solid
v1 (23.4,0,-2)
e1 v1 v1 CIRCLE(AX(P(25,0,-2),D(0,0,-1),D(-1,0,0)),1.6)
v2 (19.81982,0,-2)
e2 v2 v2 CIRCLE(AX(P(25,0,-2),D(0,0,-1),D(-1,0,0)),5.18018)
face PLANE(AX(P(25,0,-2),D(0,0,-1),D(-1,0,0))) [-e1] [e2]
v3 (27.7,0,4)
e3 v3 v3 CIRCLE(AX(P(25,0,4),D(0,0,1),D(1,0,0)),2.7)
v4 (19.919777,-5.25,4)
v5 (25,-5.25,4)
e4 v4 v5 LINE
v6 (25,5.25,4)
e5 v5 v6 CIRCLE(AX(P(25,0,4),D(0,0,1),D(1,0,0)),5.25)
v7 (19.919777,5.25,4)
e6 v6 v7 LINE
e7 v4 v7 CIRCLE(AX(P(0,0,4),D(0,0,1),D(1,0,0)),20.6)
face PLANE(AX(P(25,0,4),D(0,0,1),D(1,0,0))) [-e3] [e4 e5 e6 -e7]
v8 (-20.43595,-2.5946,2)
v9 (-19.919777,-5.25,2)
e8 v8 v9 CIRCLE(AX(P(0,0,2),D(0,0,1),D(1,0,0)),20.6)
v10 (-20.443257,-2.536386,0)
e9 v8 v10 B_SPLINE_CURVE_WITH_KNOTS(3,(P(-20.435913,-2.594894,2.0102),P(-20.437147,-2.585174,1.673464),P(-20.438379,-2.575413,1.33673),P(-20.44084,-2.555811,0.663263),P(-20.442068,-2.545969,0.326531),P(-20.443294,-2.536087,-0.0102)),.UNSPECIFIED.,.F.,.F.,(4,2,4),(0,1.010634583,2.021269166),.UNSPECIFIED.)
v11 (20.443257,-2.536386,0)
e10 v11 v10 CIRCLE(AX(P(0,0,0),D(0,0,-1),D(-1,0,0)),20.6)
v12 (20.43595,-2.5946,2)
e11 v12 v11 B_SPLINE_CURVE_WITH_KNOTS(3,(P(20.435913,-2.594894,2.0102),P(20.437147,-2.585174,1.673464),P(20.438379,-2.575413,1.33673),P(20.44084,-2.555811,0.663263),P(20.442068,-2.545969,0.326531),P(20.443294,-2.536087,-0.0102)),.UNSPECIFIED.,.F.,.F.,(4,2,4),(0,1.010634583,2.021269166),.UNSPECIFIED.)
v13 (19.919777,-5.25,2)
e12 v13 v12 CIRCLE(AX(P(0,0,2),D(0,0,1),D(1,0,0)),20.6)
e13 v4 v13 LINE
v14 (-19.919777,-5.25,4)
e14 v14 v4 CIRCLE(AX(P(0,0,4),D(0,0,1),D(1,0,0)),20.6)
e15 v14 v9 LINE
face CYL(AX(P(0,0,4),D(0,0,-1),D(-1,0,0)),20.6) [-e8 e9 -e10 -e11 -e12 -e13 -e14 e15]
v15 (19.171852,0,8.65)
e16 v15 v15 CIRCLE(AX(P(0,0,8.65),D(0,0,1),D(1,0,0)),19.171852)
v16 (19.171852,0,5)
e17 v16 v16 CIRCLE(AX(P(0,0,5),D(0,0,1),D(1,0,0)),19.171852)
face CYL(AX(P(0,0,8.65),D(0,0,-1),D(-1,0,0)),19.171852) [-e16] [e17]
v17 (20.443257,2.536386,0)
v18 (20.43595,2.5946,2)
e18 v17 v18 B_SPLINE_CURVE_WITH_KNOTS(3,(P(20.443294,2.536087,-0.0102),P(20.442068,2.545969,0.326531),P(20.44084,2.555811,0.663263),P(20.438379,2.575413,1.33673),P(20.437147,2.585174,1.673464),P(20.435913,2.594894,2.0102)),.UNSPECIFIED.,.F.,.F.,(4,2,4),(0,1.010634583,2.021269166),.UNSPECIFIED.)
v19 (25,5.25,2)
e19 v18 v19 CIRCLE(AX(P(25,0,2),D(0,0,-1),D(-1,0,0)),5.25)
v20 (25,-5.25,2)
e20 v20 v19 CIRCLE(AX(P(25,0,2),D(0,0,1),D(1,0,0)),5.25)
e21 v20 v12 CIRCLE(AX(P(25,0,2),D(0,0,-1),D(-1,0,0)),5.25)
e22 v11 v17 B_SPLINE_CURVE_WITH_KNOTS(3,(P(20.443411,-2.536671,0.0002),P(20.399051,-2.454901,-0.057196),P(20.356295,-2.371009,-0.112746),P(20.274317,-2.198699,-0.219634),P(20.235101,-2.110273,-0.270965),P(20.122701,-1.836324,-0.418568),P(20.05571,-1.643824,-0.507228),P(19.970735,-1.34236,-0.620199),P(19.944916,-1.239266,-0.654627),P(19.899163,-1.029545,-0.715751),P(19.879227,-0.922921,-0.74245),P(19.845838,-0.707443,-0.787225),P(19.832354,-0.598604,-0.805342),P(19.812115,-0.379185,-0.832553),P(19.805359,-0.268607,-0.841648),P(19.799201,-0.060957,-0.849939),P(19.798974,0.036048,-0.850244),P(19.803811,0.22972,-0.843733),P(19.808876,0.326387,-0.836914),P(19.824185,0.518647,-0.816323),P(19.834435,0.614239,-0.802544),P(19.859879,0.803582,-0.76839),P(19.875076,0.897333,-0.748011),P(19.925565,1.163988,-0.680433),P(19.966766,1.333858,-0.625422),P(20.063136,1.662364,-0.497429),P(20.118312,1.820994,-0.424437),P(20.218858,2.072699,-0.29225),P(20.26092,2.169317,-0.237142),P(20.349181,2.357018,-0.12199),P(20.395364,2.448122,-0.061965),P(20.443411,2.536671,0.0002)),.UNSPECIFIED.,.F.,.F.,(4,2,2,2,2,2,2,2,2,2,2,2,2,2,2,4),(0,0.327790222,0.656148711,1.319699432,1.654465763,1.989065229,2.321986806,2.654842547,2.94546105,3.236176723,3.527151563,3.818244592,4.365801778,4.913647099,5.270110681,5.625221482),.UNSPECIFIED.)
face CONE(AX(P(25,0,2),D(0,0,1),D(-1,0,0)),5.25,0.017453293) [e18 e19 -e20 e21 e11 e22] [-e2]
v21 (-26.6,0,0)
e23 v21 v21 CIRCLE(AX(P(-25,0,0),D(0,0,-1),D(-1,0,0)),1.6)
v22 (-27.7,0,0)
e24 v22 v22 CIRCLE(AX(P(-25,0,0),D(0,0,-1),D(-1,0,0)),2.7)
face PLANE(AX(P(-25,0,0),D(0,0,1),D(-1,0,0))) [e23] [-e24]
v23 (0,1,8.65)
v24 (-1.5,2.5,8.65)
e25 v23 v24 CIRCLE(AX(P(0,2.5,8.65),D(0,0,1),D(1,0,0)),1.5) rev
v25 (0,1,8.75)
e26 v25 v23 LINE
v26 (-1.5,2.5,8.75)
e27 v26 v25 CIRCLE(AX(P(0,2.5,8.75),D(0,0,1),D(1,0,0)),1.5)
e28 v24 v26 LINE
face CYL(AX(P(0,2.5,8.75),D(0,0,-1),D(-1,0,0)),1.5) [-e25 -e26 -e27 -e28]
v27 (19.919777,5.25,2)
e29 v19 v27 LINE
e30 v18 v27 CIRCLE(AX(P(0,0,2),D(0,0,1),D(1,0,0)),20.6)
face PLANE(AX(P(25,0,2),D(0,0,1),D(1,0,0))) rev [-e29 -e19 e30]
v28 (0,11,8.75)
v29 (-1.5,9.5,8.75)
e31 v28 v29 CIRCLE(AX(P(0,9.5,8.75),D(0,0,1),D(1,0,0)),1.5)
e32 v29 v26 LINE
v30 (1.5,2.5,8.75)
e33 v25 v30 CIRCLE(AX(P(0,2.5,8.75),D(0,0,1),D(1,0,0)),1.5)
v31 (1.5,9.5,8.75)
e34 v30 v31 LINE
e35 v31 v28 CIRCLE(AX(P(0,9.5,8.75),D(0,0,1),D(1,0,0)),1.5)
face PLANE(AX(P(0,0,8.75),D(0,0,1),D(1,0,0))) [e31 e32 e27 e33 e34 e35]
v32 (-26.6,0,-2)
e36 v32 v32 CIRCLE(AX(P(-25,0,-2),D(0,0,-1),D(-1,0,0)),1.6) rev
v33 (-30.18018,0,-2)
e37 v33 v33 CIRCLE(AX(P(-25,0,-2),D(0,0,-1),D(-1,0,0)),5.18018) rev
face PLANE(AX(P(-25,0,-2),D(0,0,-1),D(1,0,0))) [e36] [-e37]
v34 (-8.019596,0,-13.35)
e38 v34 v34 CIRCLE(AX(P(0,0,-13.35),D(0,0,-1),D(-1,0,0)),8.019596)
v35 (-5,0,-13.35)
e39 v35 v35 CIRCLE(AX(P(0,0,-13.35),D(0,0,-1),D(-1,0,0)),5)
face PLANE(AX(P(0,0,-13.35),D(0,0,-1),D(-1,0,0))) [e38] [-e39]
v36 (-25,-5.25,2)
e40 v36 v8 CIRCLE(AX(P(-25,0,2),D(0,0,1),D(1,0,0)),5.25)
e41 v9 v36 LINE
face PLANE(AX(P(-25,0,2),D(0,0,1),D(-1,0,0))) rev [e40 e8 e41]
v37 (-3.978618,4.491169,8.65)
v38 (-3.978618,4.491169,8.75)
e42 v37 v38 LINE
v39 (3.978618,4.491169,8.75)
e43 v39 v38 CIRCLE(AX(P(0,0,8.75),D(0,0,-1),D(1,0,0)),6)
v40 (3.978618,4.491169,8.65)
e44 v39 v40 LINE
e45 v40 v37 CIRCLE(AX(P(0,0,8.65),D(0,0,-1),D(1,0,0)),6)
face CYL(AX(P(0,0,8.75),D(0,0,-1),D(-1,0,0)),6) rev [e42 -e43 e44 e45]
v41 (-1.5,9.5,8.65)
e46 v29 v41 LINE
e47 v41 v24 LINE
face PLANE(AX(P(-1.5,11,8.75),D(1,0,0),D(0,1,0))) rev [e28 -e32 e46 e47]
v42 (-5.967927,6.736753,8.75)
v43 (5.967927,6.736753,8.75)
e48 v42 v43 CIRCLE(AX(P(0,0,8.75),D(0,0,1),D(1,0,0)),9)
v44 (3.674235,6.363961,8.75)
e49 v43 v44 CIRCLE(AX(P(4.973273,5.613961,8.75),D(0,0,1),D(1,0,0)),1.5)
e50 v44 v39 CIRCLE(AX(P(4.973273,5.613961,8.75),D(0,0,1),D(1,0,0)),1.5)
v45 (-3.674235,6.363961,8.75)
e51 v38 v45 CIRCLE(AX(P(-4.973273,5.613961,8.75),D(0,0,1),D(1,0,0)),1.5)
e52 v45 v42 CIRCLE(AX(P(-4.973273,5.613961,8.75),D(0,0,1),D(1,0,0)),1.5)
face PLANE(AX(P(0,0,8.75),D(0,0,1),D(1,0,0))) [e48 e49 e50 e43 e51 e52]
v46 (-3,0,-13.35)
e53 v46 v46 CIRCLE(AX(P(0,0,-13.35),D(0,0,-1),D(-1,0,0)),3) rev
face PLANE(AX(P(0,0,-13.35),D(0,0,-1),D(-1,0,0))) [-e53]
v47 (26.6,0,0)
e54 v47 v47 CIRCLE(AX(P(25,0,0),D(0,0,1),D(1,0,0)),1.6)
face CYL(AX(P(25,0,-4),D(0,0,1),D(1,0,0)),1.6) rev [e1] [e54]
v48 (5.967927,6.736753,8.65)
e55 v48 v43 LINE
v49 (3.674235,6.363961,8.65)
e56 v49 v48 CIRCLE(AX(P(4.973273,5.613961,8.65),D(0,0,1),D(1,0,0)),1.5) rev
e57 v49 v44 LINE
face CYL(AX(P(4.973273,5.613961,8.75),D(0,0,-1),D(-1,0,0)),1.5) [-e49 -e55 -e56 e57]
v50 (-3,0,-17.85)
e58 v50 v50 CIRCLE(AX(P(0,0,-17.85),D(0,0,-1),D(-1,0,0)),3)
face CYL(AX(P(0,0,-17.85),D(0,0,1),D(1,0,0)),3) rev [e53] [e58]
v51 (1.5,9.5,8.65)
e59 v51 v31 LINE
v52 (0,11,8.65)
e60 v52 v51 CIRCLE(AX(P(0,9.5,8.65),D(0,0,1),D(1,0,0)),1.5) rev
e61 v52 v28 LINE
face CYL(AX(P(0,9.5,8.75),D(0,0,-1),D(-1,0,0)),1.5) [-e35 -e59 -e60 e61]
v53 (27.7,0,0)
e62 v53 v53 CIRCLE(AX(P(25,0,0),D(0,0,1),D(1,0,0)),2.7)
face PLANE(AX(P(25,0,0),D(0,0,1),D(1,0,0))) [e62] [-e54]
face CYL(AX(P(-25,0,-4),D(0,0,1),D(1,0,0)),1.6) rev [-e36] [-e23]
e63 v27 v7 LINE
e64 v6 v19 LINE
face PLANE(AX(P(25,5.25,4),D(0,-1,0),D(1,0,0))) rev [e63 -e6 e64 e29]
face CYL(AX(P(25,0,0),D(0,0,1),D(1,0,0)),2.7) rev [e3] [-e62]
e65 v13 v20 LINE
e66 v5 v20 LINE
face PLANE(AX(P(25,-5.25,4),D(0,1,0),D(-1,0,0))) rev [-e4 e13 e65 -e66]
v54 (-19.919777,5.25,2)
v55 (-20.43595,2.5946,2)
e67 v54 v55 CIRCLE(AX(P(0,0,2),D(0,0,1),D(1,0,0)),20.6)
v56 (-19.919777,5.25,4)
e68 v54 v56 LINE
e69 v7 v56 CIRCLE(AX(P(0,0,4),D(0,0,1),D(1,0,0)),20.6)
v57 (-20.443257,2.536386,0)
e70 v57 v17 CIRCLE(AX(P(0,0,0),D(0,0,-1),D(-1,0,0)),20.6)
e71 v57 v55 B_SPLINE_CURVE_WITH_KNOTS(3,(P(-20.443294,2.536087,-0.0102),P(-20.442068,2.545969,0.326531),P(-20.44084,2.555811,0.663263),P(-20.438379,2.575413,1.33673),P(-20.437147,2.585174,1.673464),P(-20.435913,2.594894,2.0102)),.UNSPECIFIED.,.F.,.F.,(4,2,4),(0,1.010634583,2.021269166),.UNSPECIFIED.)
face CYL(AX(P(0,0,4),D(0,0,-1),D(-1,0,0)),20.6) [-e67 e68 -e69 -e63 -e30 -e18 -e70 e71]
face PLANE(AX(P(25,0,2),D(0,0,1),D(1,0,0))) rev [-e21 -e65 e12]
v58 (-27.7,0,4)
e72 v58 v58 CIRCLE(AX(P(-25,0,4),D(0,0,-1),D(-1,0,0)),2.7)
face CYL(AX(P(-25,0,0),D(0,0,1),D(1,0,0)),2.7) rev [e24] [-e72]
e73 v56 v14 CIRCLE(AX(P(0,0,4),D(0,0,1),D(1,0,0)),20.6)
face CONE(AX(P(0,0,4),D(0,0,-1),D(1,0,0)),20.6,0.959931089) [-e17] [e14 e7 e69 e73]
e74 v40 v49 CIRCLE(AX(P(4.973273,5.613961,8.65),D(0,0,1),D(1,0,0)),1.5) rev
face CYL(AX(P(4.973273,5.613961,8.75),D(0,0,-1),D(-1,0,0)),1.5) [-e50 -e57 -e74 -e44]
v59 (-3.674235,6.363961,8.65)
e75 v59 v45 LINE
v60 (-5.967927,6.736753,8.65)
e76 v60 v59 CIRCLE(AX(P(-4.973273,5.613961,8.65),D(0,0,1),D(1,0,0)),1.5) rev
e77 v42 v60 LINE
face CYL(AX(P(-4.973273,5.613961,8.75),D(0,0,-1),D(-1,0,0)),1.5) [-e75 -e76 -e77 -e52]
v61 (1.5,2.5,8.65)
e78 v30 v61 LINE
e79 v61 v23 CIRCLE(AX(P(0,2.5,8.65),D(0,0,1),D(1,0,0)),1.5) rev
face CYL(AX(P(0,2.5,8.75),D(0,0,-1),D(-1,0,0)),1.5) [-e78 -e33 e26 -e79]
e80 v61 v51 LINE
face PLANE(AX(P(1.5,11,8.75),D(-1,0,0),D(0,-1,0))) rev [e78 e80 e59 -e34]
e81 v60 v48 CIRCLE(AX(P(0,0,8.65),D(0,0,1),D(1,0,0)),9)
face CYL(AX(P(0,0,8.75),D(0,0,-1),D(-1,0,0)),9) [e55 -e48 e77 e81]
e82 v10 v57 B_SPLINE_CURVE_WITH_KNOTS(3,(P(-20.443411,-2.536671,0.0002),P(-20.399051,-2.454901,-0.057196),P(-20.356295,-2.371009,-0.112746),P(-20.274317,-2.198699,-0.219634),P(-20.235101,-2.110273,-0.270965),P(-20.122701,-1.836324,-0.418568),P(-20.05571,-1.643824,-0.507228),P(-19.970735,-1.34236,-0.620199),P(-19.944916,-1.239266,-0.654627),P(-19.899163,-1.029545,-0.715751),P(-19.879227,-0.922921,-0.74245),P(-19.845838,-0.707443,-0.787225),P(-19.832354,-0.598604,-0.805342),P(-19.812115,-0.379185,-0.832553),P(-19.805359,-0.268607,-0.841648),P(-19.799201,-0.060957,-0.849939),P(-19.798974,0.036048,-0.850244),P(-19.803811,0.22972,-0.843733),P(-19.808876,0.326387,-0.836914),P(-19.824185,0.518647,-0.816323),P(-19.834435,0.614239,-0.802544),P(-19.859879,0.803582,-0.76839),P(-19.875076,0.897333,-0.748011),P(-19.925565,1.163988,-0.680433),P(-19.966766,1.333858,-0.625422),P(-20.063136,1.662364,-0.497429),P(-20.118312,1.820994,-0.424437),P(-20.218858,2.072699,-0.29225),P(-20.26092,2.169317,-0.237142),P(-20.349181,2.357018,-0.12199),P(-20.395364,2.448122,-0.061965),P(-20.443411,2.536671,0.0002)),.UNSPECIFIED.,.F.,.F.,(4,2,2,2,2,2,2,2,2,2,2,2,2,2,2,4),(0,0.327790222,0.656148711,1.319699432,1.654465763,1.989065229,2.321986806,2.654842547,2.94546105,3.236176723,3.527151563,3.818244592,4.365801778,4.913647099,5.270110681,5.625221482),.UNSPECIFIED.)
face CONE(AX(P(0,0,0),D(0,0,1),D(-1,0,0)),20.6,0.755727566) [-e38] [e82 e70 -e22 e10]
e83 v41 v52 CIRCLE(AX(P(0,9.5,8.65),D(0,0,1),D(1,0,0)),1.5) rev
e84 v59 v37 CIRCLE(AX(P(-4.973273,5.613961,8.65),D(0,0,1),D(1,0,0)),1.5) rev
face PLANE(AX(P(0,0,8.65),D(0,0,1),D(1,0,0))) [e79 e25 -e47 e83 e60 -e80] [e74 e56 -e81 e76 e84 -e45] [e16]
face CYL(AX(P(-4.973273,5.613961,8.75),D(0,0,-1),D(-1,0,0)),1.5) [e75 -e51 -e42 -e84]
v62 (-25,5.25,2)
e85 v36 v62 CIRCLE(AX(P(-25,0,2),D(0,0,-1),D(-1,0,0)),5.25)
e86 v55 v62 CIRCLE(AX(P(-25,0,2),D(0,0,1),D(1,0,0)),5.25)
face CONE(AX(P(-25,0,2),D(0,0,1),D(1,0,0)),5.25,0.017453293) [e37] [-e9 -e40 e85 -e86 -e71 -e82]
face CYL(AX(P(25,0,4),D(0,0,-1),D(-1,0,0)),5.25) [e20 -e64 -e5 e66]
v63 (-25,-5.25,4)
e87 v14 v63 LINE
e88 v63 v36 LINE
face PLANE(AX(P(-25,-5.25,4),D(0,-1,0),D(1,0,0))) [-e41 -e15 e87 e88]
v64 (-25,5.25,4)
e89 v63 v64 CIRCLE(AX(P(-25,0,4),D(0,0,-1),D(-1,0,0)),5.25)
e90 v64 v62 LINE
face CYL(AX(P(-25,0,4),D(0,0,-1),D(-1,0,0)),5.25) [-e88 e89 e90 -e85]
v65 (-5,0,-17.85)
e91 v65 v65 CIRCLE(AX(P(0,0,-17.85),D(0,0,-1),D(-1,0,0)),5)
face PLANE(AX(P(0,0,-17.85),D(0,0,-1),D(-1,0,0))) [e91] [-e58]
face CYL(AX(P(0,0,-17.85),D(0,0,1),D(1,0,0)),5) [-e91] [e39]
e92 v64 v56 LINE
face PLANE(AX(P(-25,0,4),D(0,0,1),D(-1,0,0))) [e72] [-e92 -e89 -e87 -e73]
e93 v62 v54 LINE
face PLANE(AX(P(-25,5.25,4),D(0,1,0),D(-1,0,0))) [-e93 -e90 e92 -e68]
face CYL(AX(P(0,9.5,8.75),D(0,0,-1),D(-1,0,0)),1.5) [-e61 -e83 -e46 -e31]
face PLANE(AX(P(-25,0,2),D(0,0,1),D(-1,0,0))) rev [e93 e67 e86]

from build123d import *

# Parameters (mm, degrees)
SKETCH_1_R          = 20.6
EXTRUDE_1_DEPTH     = 4
SKETCH_2_R          = 20.6
EXTRUDE_2_DEPTH     = 1
EXTRUDE_2_TAPER     = 55
SKETCH_3_R          = 19.171851993
EXTRUDE_3_DEPTH     = 3.65
SKETCH_4_R          = 20.6
EXTRUDE_4_DEPTH     = 13.35
EXTRUDE_4_TAPER     = 43.3
SKETCH_5_R          = 5
SKETCH_5_R_2        = 3
EXTRUDE_5_DEPTH     = 4.5
EXTRUDE_START       = 2
EXTRUDE_6_DEPTH     = 2
SKETCH_7_R          = 5.25
EXTRUDE_8_DEPTH     = 4
EXTRUDE_8_TAPER     = 1
SKETCH_8_R          = 2.7
CUT_EXTRUDE_1_DEPTH = 4
SKETCH_9_R          = 1.6
CUT_EXTRUDE_2_DEPTH = 4
SKETCH_10_W         = 3
SKETCH_10_H         = 10
EXTRUDE_9_DEPTH     = 0.1
FILLET_1_R          = 1.5


with BuildPart() as part:
    # 草图1 → 凸台-拉伸1 (new body)
    with BuildSketch(Plane.XY):
        Circle(SKETCH_1_R)
    extrude(amount=EXTRUDE_1_DEPTH)

    # 草图2 → 凸台-拉伸2 (add)
    with BuildSketch(Plane.XY.offset(4)):
        Circle(SKETCH_2_R)
    extrude(amount=EXTRUDE_2_DEPTH, taper=EXTRUDE_2_TAPER)

    # 草图3 → 凸台-拉伸3 (add)
    with BuildSketch(Plane.XY.offset(5)):
        Circle(SKETCH_3_R)
    extrude(amount=EXTRUDE_3_DEPTH)

    # 草图4 → 凸台-拉伸4 (add)
    with BuildSketch(Plane(origin=(0, 0, 0), x_dir=(-1, 0, 0), z_dir=(0, 0, -1))):
        Circle(SKETCH_4_R)
    extrude(amount=EXTRUDE_4_DEPTH, taper=EXTRUDE_4_TAPER)

    # 草图5 → 凸台-拉伸5 (add)
    with BuildSketch(Plane(origin=(0, 0, -13.35), x_dir=(-1, 0, 0), z_dir=(0, 0, -1))):
        Circle(SKETCH_5_R)
        Circle(SKETCH_5_R_2, mode=Mode.SUBTRACT)
    extrude(amount=EXTRUDE_5_DEPTH)

    # 草图6 → 凸台-拉伸6 (add)
    with BuildSketch(Plane.XY.offset(EXTRUDE_START)):
        with BuildLine():
            Line((25, 5.25), (19.069776605, 5.25))
            Line((19.069776605, 5.25), (19.069776605, -5.25))
            Line((19.069776605, -5.25), (25, -5.25))
            ThreePointArc((25, -5.25), (30.25, 0), (25, 5.25))
        make_face()
    extrude_6 = extrude(amount=EXTRUDE_6_DEPTH)

    # 草图7 → 凸台-拉伸8 (add)
    with BuildSketch(Plane(origin=(0, 0, 2), x_dir=(-1, 0, 0), z_dir=(0, 0, -1))):
        with Locations((-25, 0)):
            Circle(SKETCH_7_R)
    extrude_8 = extrude(amount=EXTRUDE_8_DEPTH, taper=EXTRUDE_8_TAPER)

    # 草图8 → 切除-拉伸1 (cut)
    with BuildSketch(Plane.XY.offset(4)):
        with Locations((25, 0)):
            Circle(SKETCH_8_R)
    cut_extrude_1 = extrude(amount=-CUT_EXTRUDE_1_DEPTH, mode=Mode.SUBTRACT)

    # 草图9 → 切除-拉伸2 (cut)
    with BuildSketch(Plane.XY):
        with Locations((25, 0)):
            Circle(SKETCH_9_R)
    cut_extrude_2 = extrude(amount=-CUT_EXTRUDE_2_DEPTH, mode=Mode.SUBTRACT)

    # 镜向1: 凸台-拉伸6, 凸台-拉伸8, 切除-拉伸1, 切除-拉伸2 across plane
    add(extrude_6.mirror(Plane(origin=(0, 0, 0), x_dir=(0, 0, 1), z_dir=(1, 0, 0))))
    add(extrude_8.mirror(Plane(origin=(0, 0, 0), x_dir=(0, 0, 1), z_dir=(1, 0, 0))))
    add(cut_extrude_1.mirror(Plane(origin=(0, 0, 0), x_dir=(0, 0, 1), z_dir=(1, 0, 0))), mode=Mode.SUBTRACT)
    add(cut_extrude_2.mirror(Plane(origin=(0, 0, 0), x_dir=(0, 0, 1), z_dir=(1, 0, 0))), mode=Mode.SUBTRACT)

    # 草图10 → 凸台-拉伸9 (add)
    with BuildSketch(Plane.XY.offset(8.65)):
        with BuildLine():
            Line((-3, 5.196152423), (-4.5, 7.794228634))
            ThreePointArc((-4.5, 7.794228634), (0, -9), (4.5, 7.794228634))
            Line((4.5, 7.794228634), (3, 5.196152423))
            ThreePointArc((3, 5.196152423), (0, -6), (-3, 5.196152423))
        make_face()
        with Locations((0, 6)):
            Rectangle(SKETCH_10_W, SKETCH_10_H)
    extrude(amount=EXTRUDE_9_DEPTH)

    # 圆角1
    fillet_1_edges = [part.edges().sort_by_distance(p)[0] for p in [
        (-3, 5.196152423, 8.7),
        (-4.5, 7.794228634, 8.7),
        (1.5, 1, 8.7),
        (-1.5, 1, 8.7),
        (1.5, 11, 8.7),
        (-1.5, 11, 8.7),
        (4.5, 7.794228634, 8.7),
        (3, 5.196152423, 8.7),
    ]]
    fillet(fillet_1_edges, radius=FILLET_1_R - 0.0001)  # a hair under: the kernel refuses the full size


solid = part.part
